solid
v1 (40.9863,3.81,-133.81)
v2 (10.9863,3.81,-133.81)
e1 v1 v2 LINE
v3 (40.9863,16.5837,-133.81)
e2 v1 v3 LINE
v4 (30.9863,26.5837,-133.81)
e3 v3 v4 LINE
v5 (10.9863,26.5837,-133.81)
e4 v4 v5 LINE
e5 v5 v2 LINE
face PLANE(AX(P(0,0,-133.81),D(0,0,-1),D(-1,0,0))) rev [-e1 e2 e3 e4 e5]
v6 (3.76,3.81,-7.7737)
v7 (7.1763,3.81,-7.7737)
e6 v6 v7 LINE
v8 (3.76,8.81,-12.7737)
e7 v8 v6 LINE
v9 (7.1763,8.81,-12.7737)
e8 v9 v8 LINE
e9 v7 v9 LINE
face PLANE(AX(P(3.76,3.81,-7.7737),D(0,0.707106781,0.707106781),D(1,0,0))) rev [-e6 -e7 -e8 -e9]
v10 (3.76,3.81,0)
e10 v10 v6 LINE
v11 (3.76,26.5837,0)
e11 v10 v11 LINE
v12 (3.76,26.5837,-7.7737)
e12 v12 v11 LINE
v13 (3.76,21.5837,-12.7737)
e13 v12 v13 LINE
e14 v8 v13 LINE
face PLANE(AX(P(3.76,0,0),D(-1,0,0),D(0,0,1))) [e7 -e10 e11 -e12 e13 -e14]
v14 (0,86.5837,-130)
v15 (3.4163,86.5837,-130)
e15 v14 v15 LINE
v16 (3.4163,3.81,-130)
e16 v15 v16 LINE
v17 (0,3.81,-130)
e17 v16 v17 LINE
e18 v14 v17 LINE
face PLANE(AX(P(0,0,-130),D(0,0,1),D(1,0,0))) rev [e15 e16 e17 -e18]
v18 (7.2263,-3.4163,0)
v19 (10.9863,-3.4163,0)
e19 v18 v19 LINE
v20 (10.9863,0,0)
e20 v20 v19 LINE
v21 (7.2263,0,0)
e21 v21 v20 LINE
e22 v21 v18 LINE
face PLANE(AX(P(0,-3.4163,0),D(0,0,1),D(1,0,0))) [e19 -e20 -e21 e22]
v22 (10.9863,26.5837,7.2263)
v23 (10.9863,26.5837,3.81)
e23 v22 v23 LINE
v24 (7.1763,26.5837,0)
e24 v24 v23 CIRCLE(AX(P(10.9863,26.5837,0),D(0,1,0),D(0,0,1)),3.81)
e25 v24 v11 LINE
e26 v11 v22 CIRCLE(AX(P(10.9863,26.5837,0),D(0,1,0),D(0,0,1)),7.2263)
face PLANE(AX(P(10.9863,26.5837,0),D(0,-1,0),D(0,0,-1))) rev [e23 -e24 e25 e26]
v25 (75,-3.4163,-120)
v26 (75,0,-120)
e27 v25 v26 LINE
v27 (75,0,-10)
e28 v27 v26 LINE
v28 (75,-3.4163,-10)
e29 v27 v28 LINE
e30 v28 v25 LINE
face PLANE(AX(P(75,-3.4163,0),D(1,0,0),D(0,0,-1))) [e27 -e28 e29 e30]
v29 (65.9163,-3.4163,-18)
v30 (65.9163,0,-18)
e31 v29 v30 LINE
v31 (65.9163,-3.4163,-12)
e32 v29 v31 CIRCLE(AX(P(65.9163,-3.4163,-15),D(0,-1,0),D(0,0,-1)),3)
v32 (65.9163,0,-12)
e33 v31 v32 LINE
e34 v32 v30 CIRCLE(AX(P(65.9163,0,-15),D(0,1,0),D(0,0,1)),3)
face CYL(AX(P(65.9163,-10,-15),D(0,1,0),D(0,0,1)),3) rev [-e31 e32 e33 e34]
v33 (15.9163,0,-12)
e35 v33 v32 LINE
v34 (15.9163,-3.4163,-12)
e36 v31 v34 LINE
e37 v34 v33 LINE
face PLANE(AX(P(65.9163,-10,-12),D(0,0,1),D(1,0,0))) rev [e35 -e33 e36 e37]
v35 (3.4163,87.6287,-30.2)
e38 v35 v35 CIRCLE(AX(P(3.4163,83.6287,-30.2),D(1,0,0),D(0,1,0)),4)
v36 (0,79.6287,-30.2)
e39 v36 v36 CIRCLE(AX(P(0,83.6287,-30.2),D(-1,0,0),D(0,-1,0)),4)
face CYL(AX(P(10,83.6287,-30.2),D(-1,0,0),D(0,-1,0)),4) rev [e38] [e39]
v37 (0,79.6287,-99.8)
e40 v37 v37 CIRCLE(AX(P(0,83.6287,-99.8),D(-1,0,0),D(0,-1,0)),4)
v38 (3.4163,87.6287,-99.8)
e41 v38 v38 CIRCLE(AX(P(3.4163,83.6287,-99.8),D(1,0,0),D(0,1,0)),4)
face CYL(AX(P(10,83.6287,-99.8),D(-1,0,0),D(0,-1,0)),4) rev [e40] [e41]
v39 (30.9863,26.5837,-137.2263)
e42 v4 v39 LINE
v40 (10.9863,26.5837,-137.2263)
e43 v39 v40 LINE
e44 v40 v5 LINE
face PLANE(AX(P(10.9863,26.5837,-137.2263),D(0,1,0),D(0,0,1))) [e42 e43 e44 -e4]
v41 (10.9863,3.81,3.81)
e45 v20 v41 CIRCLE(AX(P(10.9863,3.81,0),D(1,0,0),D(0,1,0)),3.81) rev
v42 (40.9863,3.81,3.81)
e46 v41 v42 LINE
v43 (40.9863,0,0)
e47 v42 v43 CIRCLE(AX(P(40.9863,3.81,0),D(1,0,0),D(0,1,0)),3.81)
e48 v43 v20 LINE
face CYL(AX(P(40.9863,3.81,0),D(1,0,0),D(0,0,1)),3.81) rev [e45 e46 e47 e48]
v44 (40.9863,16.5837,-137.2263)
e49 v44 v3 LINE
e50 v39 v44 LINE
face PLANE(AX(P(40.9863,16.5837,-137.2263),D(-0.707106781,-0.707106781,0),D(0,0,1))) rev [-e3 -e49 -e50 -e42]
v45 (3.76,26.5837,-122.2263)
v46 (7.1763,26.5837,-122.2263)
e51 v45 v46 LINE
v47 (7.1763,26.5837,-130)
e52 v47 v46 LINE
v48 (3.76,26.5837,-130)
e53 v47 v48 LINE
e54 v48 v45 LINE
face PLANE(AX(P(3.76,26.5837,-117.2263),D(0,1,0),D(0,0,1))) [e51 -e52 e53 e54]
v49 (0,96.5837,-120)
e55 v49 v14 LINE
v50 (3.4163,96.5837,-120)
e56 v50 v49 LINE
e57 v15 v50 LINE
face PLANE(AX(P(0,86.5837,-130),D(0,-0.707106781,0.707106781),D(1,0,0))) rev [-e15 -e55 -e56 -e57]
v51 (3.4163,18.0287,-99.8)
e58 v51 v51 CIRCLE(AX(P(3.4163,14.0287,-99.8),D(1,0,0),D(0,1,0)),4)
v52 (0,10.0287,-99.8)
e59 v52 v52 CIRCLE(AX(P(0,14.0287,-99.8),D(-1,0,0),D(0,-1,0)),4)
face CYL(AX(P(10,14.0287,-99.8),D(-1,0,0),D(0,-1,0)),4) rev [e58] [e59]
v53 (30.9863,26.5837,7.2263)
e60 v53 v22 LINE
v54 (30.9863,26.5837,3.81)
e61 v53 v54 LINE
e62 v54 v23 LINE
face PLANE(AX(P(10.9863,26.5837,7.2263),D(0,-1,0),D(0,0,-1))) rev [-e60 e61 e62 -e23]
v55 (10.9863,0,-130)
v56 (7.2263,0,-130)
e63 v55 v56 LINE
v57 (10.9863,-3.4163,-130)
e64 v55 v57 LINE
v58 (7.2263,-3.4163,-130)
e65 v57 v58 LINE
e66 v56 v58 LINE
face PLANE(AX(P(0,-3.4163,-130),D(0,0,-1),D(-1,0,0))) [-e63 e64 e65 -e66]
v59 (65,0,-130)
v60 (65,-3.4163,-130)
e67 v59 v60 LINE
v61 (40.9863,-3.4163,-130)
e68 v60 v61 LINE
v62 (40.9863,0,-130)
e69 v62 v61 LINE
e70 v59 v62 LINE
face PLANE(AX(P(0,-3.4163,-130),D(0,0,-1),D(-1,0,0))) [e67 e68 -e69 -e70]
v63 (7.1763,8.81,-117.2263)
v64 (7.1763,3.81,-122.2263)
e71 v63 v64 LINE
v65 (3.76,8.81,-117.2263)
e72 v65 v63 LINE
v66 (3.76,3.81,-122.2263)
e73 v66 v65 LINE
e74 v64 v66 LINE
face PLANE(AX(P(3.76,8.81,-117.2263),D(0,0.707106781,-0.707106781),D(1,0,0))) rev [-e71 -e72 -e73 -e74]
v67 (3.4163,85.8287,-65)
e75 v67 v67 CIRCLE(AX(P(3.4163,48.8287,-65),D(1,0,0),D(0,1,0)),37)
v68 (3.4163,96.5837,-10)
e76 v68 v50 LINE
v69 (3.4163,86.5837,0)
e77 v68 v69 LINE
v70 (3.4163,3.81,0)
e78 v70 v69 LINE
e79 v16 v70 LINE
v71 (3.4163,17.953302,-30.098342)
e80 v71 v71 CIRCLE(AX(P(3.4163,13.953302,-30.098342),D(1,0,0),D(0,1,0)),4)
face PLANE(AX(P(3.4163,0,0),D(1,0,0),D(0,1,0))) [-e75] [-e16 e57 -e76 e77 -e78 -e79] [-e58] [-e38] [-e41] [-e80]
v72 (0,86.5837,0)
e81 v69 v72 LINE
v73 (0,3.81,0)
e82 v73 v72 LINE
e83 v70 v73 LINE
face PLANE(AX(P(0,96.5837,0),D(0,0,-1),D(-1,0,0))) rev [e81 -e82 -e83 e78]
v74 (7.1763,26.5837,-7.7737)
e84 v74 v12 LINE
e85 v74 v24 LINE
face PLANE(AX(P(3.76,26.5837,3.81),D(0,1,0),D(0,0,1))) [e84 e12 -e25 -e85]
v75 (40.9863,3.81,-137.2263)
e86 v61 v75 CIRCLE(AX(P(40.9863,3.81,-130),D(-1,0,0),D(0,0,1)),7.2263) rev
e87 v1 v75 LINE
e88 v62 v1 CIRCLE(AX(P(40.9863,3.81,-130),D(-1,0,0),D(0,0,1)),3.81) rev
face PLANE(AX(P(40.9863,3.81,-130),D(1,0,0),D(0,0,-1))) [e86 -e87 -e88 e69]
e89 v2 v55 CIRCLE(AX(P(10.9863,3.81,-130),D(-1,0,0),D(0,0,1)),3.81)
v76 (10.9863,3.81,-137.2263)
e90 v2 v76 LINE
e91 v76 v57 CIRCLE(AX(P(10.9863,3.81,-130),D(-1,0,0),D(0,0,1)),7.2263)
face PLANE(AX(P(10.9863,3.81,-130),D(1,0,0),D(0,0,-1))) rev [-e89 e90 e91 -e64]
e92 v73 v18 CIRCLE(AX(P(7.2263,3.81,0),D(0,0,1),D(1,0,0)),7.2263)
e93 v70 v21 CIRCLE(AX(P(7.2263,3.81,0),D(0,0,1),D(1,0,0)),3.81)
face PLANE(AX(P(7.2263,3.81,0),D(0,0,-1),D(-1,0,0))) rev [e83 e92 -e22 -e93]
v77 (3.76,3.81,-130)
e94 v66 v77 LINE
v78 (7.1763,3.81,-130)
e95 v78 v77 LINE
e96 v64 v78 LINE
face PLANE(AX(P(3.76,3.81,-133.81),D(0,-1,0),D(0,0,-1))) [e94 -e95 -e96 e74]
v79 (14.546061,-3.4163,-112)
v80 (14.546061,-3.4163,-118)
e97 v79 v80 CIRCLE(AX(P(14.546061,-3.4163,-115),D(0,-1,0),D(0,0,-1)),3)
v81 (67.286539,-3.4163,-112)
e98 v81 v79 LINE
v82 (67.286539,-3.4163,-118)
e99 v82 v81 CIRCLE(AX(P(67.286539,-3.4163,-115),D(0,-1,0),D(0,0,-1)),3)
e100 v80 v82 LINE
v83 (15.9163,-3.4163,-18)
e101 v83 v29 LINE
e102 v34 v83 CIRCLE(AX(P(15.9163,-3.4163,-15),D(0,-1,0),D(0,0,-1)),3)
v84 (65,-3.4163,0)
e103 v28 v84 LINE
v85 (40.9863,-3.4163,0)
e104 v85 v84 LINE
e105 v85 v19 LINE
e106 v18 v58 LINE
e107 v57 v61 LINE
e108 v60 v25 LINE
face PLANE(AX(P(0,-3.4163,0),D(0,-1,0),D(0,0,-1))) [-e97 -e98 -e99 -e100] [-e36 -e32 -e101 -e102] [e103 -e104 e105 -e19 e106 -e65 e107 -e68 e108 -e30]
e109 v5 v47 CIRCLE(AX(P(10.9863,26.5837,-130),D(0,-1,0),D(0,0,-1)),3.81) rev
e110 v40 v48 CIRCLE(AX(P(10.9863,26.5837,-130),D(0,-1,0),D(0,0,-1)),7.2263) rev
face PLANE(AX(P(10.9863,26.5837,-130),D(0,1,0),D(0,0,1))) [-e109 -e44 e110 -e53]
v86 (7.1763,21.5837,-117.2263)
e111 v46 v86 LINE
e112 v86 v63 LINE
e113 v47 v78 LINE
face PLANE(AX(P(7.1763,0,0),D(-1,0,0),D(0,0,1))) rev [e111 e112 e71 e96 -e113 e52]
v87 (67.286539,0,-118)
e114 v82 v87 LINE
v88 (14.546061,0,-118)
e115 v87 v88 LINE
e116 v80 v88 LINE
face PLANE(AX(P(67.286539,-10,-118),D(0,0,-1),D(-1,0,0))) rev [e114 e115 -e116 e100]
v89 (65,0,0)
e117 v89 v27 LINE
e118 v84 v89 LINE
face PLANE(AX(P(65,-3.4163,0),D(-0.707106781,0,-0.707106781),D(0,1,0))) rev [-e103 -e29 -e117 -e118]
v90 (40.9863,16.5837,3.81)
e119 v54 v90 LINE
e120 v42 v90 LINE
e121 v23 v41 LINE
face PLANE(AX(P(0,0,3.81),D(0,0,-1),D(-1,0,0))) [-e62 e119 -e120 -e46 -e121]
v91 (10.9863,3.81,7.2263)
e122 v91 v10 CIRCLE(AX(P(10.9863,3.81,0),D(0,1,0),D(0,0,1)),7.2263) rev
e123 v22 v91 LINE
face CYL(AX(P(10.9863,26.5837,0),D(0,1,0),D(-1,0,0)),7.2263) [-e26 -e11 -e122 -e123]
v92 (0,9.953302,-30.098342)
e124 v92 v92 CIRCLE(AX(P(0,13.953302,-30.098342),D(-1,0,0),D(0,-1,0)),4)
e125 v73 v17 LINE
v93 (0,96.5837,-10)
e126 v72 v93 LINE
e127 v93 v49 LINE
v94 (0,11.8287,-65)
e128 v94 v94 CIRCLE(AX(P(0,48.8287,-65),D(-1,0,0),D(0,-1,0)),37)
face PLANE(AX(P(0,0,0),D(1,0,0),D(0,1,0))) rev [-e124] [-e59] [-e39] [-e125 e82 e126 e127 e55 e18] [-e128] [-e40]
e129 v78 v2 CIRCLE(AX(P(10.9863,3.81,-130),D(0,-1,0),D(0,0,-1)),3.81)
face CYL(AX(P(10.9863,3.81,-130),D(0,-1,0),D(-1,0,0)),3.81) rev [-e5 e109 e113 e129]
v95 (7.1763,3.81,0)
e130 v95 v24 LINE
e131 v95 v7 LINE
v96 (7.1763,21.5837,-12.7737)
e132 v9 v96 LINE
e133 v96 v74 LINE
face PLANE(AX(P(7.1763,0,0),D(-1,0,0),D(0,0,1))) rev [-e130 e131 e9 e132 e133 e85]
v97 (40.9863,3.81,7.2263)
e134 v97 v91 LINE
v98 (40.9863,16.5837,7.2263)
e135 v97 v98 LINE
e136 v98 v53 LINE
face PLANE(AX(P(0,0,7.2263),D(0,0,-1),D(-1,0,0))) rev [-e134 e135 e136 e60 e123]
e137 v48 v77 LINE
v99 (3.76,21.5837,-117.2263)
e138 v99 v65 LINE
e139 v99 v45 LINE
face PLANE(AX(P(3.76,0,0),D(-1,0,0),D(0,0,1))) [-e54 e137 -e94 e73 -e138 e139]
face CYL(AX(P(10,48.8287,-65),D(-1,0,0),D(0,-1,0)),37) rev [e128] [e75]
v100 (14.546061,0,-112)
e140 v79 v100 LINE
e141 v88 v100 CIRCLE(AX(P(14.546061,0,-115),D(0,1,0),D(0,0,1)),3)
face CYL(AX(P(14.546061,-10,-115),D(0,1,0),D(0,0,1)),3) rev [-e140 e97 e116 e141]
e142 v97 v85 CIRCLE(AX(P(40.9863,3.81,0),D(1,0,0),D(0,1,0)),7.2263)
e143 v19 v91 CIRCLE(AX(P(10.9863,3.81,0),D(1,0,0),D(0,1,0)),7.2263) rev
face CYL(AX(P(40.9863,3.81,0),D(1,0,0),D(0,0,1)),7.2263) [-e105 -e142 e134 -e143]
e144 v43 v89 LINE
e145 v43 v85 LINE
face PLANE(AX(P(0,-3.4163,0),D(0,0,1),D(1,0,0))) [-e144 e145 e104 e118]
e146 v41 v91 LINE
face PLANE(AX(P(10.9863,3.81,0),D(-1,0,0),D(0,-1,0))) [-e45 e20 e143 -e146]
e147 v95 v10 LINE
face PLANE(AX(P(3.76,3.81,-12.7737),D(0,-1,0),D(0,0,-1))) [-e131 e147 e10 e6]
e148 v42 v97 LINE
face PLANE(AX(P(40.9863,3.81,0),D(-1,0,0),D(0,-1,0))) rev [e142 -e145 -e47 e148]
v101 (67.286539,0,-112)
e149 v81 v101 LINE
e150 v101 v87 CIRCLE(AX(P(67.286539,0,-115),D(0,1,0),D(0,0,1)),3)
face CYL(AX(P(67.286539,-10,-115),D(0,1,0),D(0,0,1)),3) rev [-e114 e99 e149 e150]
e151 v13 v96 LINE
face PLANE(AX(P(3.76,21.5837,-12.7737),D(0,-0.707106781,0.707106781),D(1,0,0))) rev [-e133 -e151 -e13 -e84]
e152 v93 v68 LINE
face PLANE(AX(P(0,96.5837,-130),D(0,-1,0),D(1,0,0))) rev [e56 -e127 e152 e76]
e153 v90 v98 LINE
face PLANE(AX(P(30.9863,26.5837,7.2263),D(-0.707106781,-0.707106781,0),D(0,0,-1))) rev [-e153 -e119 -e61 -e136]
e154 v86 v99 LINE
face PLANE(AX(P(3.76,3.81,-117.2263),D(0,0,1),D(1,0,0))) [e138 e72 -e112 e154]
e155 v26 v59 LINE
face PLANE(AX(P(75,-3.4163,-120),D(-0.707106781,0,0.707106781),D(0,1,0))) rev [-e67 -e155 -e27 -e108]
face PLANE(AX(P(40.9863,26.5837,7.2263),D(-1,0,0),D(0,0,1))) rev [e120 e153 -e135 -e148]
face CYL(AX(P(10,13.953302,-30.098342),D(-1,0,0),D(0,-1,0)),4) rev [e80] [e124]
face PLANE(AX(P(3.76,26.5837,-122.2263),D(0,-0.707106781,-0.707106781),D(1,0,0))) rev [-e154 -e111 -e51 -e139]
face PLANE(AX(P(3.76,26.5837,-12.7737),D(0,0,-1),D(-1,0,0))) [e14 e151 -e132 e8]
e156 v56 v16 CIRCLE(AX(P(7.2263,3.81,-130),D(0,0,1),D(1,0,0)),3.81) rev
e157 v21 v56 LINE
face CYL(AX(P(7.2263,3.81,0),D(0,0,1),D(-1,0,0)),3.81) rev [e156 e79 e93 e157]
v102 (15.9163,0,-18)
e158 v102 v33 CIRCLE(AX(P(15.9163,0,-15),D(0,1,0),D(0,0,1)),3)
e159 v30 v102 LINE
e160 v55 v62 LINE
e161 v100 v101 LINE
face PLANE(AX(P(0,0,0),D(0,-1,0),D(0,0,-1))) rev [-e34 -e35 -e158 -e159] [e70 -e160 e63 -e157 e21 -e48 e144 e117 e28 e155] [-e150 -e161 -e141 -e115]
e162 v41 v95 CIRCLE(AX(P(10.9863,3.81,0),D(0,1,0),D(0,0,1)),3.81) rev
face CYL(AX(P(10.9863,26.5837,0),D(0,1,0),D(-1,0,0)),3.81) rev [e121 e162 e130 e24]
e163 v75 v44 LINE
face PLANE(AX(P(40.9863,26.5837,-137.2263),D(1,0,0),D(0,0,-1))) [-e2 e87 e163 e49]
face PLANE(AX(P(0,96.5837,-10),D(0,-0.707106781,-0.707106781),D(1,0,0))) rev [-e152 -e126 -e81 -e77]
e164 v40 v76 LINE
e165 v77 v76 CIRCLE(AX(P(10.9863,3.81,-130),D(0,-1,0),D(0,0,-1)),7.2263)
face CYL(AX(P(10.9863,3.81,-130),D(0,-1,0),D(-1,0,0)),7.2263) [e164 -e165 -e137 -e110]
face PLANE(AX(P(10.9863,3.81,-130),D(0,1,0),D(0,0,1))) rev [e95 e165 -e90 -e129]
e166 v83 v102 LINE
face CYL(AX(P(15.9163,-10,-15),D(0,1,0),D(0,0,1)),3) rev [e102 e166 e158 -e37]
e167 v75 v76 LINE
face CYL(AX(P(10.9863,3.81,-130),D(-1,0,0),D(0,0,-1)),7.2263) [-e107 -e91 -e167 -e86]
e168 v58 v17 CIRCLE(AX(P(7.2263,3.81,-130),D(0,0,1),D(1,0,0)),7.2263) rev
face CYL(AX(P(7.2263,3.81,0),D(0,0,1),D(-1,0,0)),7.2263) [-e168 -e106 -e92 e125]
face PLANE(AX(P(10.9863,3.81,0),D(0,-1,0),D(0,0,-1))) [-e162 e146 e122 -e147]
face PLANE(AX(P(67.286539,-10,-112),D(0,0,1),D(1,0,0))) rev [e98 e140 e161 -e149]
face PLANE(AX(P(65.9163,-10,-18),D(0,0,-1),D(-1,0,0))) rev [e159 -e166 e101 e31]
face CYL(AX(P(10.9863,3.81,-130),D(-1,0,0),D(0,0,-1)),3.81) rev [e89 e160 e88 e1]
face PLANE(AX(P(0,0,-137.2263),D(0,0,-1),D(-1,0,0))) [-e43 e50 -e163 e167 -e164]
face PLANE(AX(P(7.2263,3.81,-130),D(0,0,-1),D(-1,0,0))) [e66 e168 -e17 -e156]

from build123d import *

# Parameters (mm, degrees)
SKETCH1_W                    = 75
SKETCH1_H                    = 130
BASE_FLANGE1_DEPTH           = 3.4163
EDGE_FLANGE1_STRIP_W         = 21.2852
EDGE_FLANGE1_STRIP_H         = 3.4163
EDGE_FLANGE1_STRIP_CUT_DEPTH = 130
EDGE_FLANGE1_DEPTH           = 130
SKETCH18_R                   = 37
SKETCH18_R_2                 = 4
CUT_EXTRUDE1_DEPTH           = 10
BREAK_CORNER1_DEPTH          = 3.4163
BREAK_CORNER2_START          = -3.4163
BREAK_CORNER2_DEPTH          = 3.4163
CUT_EXTRUDE2_DEPTH           = 10
EDGE_FLANGE2_DEPTH           = 30
EDGE_FLANGE3_DEPTH           = 22.7737
EDGE_FLANGE4_DEPTH           = 30
EDGE_FLANGE5_DEPTH           = 22.7737
BREAK_CORNER3_START          = 40.708137393
BREAK_CORNER3_OUTLINE_W      = 17
BREAK_CORNER3_OUTLINE_H      = 3.4163
BREAK_CORNER3_DEPTH          = 7.071067812
BREAK_CORNER4_START          = 3.76
BREAK_CORNER4_DEPTH          = 3.4163


# Read off the part's stored shape, not the designer's step: Break-Corner1, Break-Corner2, Break-Corner3, Break-Corner4
# Sheet-metal steps are written as plain solids
with BuildPart() as part:
    # Sketch1 → Base-Flange1 (new body)
    with BuildSketch(Plane(origin=(0, 0, 0), x_dir=(1, 0, 0), z_dir=(0, 1, 0))):
        with Locations((37.5, 65)):
            Rectangle(SKETCH1_W, SKETCH1_H)
    extrude(amount=-BASE_FLANGE1_DEPTH)

    # Edge-Flange1 strip (across the edge) → Edge-Flange1 strip cut (cut)
    with BuildSketch(Plane.XY.offset(-130)):
        with Locations((-3.4163, -1.70815)):
            Rectangle(EDGE_FLANGE1_STRIP_W, EDGE_FLANGE1_STRIP_H)
    extrude(amount=EDGE_FLANGE1_STRIP_CUT_DEPTH, mode=Mode.SUBTRACT)

    # Edge-Flange1 section (across the edge) → Edge-Flange1 (add)
    with BuildSketch(Plane.XY.offset(-130)):
        with BuildLine():
            Line((0, 3.81), (0, 96.5837))
            Line((0, 96.5837), (3.4163, 96.5837))
            Line((3.4163, 96.5837), (3.4163, 3.81))
            ThreePointArc((3.4163, 3.81), (4.532223164, 1.115923164), (7.2263, 0))
            Line((7.2263, 0), (7.2263, -3.4163))
            ThreePointArc((7.2263, -3.4163), (2.116534267, -1.299765733), (0, 3.81))
        make_face()
    extrude(amount=EDGE_FLANGE1_DEPTH)

    # Sketch18 → Cut-Extrude1 (cut)
    with BuildSketch(Plane.ZY):
        with Locations(Location((-65, 48.8287, 0), (0, 0, 270))):
            Circle(SKETCH18_R)
        with Locations(Location((-99.8, 83.6287, 0), (0, 0, 270))):
            Circle(SKETCH18_R_2)
        with Locations(Location((-30.2, 83.6287, 0), (0, 0, 270))):
            Circle(SKETCH18_R_2)
        with Locations(Location((-30.098341997, 13.953302375, 0), (0, 0, 270))):
            Circle(SKETCH18_R_2)
        with Locations(Location((-99.8, 14.0287, 0), (0, 0, 270))):
            Circle(SKETCH18_R_2)
    extrude(amount=-CUT_EXTRUDE1_DEPTH, mode=Mode.SUBTRACT)

    # Break-Corner1 outline → Break-Corner1 (cut)
    with BuildSketch(Plane.YZ):
        Polygon((96.5837, 0), (86.5837, 0), (96.5837, -10), align=None)
        Polygon((96.5837, -130), (96.5837, -120), (86.5837, -130), align=None)
    extrude(amount=BREAK_CORNER1_DEPTH, mode=Mode.SUBTRACT)

    # Break-Corner2 outline → Break-Corner2 (cut)
    with BuildSketch(Plane(origin=(0, 0, 0), x_dir=(1, 0, 0), z_dir=(0, 1, 0)).offset(BREAK_CORNER2_START)):
        Polygon((75, 0), (75, 10), (65, 0), align=None)
        Polygon((65, 130), (75, 120), (75, 130), align=None)
    extrude(amount=BREAK_CORNER2_DEPTH, mode=Mode.SUBTRACT)

    # Sketch19 → Cut-Extrude2 (cut)
    with BuildSketch(Plane(origin=(0, 0, 0), x_dir=(1, 0, 0), z_dir=(0, 1, 0))):
        with BuildLine():
            Line((67.28653865, 112), (14.54606135, 112))
            ThreePointArc((14.54606135, 112), (11.54606135, 115), (14.54606135, 118))
            Line((14.54606135, 118), (67.28653865, 118))
            ThreePointArc((67.28653865, 118), (70.28653865, 115), (67.28653865, 112))
        make_face()
        with BuildLine():
            Line((65.9163, 12), (15.9163, 12))
            ThreePointArc((15.9163, 12), (12.9163, 15), (15.9163, 18))
            Line((15.9163, 18), (65.9163, 18))
            ThreePointArc((65.9163, 18), (68.9163, 15), (65.9163, 12))
        make_face()
    extrude(amount=-CUT_EXTRUDE2_DEPTH, mode=Mode.SUBTRACT)

    # Edge-Flange2 section (across the edge) → Edge-Flange2 (add)
    with BuildSketch(Plane(origin=(10.9863, 0, 3.81), x_dir=(0, 0, -1), z_dir=(1, 0, 0))):
        with BuildLine():
            Line((-3.4163, 3.81), (-3.4163, 26.5837))
            Line((-3.4163, 26.5837), (0, 26.5837))
            Line((0, 26.5837), (0, 3.81))
            ThreePointArc((0, 3.81), (1.115923164, 1.115923164), (3.81, 0))
            Line((3.81, 0), (3.81, -3.4163))
            ThreePointArc((3.81, -3.4163), (-1.299765733, -1.299765733), (-3.4163, 3.81))
        make_face()
    extrude(amount=EDGE_FLANGE2_DEPTH)

    # Edge-Flange3 section (across the edge) → Edge-Flange3 (add)
    with BuildSketch(Plane(origin=(7.1763, 3.81, 3.81), x_dir=(1, 0, 0), z_dir=(0, 1, 0))):
        with BuildLine():
            Line((-3.4163, 3.81), (-3.4163, 16.5837))
            Line((-3.4163, 16.5837), (0, 16.5837))
            Line((0, 16.5837), (0, 3.81))
            ThreePointArc((0, 3.81), (1.115923164, 1.115923164), (3.81, 0))
            Line((3.81, 0), (3.81, -3.4163))
            ThreePointArc((3.81, -3.4163), (-1.299765733, -1.299765733), (-3.4163, 3.81))
        make_face()
    extrude(amount=EDGE_FLANGE3_DEPTH)

    # Edge-Flange4 section (across the edge) → Edge-Flange4 (add)
    with BuildSketch(Plane(origin=(40.9863, 0, -133.81), x_dir=(0, 0, 1), z_dir=(-1, 0, 0))):
        with BuildLine():
            Line((-3.4163, 3.81), (-3.4163, 26.5837))
            Line((-3.4163, 26.5837), (0, 26.5837))
            Line((0, 26.5837), (0, 3.81))
            ThreePointArc((0, 3.81), (1.115923164, 1.115923164), (3.81, 0))
            Line((3.81, 0), (3.81, -3.4163))
            ThreePointArc((3.81, -3.4163), (-1.299765733, -1.299765733), (-3.4163, 3.81))
        make_face()
    extrude(amount=EDGE_FLANGE4_DEPTH)

    # Edge-Flange5 section (across the edge) → Edge-Flange5 (add)
    with BuildSketch(Plane(origin=(7.1763, 26.5837, -133.81), x_dir=(1, 0, 0), z_dir=(0, -1, 0))):
        with BuildLine():
            Line((-3.4163, 3.81), (-3.4163, 16.5837))
            Line((-3.4163, 16.5837), (0, 16.5837))
            Line((0, 16.5837), (0, 3.81))
            ThreePointArc((0, 3.81), (1.115923164, 1.115923164), (3.81, 0))
            Line((3.81, 0), (3.81, -3.4163))
            ThreePointArc((3.81, -3.4163), (-1.299765733, -1.299765733), (-3.4163, 3.81))
        make_face()
    extrude(amount=EDGE_FLANGE5_DEPTH)

    # Break-Corner3 outline → Break-Corner3 (cut)
    with BuildSketch(Plane(origin=(0, 0, 0), x_dir=(0.7071067811865471, -0.707106781186548, 0), z_dir=(0.707106781186548, 0.707106781186547, 0)).offset(BREAK_CORNER3_START)):
        with Locations((10.5, -5.51815)):
            Rectangle(BREAK_CORNER3_OUTLINE_W, BREAK_CORNER3_OUTLINE_H)
        with Locations((10.5, 135.51815)):
            Rectangle(BREAK_CORNER3_OUTLINE_W, BREAK_CORNER3_OUTLINE_H)
    extrude(amount=BREAK_CORNER3_DEPTH, mode=Mode.SUBTRACT)

    # Break-Corner4 outline → Break-Corner4 (cut)
    with BuildSketch(Plane.YZ.offset(BREAK_CORNER4_START)):
        Polygon((3.81, -12.7737), (8.81, -12.7737), (3.81, -7.7737), align=None)
        Polygon((26.5837, -7.7737), (21.5837, -12.7737), (26.5837, -12.7737), align=None)
        Polygon((26.5837, -117.2263), (21.5837, -117.2263), (26.5837, -122.2263), align=None)
        Polygon((3.81, -122.2263), (8.81, -117.2263), (3.81, -117.2263), align=None)
    extrude(amount=BREAK_CORNER4_DEPTH, mode=Mode.SUBTRACT)


solid = part.part
